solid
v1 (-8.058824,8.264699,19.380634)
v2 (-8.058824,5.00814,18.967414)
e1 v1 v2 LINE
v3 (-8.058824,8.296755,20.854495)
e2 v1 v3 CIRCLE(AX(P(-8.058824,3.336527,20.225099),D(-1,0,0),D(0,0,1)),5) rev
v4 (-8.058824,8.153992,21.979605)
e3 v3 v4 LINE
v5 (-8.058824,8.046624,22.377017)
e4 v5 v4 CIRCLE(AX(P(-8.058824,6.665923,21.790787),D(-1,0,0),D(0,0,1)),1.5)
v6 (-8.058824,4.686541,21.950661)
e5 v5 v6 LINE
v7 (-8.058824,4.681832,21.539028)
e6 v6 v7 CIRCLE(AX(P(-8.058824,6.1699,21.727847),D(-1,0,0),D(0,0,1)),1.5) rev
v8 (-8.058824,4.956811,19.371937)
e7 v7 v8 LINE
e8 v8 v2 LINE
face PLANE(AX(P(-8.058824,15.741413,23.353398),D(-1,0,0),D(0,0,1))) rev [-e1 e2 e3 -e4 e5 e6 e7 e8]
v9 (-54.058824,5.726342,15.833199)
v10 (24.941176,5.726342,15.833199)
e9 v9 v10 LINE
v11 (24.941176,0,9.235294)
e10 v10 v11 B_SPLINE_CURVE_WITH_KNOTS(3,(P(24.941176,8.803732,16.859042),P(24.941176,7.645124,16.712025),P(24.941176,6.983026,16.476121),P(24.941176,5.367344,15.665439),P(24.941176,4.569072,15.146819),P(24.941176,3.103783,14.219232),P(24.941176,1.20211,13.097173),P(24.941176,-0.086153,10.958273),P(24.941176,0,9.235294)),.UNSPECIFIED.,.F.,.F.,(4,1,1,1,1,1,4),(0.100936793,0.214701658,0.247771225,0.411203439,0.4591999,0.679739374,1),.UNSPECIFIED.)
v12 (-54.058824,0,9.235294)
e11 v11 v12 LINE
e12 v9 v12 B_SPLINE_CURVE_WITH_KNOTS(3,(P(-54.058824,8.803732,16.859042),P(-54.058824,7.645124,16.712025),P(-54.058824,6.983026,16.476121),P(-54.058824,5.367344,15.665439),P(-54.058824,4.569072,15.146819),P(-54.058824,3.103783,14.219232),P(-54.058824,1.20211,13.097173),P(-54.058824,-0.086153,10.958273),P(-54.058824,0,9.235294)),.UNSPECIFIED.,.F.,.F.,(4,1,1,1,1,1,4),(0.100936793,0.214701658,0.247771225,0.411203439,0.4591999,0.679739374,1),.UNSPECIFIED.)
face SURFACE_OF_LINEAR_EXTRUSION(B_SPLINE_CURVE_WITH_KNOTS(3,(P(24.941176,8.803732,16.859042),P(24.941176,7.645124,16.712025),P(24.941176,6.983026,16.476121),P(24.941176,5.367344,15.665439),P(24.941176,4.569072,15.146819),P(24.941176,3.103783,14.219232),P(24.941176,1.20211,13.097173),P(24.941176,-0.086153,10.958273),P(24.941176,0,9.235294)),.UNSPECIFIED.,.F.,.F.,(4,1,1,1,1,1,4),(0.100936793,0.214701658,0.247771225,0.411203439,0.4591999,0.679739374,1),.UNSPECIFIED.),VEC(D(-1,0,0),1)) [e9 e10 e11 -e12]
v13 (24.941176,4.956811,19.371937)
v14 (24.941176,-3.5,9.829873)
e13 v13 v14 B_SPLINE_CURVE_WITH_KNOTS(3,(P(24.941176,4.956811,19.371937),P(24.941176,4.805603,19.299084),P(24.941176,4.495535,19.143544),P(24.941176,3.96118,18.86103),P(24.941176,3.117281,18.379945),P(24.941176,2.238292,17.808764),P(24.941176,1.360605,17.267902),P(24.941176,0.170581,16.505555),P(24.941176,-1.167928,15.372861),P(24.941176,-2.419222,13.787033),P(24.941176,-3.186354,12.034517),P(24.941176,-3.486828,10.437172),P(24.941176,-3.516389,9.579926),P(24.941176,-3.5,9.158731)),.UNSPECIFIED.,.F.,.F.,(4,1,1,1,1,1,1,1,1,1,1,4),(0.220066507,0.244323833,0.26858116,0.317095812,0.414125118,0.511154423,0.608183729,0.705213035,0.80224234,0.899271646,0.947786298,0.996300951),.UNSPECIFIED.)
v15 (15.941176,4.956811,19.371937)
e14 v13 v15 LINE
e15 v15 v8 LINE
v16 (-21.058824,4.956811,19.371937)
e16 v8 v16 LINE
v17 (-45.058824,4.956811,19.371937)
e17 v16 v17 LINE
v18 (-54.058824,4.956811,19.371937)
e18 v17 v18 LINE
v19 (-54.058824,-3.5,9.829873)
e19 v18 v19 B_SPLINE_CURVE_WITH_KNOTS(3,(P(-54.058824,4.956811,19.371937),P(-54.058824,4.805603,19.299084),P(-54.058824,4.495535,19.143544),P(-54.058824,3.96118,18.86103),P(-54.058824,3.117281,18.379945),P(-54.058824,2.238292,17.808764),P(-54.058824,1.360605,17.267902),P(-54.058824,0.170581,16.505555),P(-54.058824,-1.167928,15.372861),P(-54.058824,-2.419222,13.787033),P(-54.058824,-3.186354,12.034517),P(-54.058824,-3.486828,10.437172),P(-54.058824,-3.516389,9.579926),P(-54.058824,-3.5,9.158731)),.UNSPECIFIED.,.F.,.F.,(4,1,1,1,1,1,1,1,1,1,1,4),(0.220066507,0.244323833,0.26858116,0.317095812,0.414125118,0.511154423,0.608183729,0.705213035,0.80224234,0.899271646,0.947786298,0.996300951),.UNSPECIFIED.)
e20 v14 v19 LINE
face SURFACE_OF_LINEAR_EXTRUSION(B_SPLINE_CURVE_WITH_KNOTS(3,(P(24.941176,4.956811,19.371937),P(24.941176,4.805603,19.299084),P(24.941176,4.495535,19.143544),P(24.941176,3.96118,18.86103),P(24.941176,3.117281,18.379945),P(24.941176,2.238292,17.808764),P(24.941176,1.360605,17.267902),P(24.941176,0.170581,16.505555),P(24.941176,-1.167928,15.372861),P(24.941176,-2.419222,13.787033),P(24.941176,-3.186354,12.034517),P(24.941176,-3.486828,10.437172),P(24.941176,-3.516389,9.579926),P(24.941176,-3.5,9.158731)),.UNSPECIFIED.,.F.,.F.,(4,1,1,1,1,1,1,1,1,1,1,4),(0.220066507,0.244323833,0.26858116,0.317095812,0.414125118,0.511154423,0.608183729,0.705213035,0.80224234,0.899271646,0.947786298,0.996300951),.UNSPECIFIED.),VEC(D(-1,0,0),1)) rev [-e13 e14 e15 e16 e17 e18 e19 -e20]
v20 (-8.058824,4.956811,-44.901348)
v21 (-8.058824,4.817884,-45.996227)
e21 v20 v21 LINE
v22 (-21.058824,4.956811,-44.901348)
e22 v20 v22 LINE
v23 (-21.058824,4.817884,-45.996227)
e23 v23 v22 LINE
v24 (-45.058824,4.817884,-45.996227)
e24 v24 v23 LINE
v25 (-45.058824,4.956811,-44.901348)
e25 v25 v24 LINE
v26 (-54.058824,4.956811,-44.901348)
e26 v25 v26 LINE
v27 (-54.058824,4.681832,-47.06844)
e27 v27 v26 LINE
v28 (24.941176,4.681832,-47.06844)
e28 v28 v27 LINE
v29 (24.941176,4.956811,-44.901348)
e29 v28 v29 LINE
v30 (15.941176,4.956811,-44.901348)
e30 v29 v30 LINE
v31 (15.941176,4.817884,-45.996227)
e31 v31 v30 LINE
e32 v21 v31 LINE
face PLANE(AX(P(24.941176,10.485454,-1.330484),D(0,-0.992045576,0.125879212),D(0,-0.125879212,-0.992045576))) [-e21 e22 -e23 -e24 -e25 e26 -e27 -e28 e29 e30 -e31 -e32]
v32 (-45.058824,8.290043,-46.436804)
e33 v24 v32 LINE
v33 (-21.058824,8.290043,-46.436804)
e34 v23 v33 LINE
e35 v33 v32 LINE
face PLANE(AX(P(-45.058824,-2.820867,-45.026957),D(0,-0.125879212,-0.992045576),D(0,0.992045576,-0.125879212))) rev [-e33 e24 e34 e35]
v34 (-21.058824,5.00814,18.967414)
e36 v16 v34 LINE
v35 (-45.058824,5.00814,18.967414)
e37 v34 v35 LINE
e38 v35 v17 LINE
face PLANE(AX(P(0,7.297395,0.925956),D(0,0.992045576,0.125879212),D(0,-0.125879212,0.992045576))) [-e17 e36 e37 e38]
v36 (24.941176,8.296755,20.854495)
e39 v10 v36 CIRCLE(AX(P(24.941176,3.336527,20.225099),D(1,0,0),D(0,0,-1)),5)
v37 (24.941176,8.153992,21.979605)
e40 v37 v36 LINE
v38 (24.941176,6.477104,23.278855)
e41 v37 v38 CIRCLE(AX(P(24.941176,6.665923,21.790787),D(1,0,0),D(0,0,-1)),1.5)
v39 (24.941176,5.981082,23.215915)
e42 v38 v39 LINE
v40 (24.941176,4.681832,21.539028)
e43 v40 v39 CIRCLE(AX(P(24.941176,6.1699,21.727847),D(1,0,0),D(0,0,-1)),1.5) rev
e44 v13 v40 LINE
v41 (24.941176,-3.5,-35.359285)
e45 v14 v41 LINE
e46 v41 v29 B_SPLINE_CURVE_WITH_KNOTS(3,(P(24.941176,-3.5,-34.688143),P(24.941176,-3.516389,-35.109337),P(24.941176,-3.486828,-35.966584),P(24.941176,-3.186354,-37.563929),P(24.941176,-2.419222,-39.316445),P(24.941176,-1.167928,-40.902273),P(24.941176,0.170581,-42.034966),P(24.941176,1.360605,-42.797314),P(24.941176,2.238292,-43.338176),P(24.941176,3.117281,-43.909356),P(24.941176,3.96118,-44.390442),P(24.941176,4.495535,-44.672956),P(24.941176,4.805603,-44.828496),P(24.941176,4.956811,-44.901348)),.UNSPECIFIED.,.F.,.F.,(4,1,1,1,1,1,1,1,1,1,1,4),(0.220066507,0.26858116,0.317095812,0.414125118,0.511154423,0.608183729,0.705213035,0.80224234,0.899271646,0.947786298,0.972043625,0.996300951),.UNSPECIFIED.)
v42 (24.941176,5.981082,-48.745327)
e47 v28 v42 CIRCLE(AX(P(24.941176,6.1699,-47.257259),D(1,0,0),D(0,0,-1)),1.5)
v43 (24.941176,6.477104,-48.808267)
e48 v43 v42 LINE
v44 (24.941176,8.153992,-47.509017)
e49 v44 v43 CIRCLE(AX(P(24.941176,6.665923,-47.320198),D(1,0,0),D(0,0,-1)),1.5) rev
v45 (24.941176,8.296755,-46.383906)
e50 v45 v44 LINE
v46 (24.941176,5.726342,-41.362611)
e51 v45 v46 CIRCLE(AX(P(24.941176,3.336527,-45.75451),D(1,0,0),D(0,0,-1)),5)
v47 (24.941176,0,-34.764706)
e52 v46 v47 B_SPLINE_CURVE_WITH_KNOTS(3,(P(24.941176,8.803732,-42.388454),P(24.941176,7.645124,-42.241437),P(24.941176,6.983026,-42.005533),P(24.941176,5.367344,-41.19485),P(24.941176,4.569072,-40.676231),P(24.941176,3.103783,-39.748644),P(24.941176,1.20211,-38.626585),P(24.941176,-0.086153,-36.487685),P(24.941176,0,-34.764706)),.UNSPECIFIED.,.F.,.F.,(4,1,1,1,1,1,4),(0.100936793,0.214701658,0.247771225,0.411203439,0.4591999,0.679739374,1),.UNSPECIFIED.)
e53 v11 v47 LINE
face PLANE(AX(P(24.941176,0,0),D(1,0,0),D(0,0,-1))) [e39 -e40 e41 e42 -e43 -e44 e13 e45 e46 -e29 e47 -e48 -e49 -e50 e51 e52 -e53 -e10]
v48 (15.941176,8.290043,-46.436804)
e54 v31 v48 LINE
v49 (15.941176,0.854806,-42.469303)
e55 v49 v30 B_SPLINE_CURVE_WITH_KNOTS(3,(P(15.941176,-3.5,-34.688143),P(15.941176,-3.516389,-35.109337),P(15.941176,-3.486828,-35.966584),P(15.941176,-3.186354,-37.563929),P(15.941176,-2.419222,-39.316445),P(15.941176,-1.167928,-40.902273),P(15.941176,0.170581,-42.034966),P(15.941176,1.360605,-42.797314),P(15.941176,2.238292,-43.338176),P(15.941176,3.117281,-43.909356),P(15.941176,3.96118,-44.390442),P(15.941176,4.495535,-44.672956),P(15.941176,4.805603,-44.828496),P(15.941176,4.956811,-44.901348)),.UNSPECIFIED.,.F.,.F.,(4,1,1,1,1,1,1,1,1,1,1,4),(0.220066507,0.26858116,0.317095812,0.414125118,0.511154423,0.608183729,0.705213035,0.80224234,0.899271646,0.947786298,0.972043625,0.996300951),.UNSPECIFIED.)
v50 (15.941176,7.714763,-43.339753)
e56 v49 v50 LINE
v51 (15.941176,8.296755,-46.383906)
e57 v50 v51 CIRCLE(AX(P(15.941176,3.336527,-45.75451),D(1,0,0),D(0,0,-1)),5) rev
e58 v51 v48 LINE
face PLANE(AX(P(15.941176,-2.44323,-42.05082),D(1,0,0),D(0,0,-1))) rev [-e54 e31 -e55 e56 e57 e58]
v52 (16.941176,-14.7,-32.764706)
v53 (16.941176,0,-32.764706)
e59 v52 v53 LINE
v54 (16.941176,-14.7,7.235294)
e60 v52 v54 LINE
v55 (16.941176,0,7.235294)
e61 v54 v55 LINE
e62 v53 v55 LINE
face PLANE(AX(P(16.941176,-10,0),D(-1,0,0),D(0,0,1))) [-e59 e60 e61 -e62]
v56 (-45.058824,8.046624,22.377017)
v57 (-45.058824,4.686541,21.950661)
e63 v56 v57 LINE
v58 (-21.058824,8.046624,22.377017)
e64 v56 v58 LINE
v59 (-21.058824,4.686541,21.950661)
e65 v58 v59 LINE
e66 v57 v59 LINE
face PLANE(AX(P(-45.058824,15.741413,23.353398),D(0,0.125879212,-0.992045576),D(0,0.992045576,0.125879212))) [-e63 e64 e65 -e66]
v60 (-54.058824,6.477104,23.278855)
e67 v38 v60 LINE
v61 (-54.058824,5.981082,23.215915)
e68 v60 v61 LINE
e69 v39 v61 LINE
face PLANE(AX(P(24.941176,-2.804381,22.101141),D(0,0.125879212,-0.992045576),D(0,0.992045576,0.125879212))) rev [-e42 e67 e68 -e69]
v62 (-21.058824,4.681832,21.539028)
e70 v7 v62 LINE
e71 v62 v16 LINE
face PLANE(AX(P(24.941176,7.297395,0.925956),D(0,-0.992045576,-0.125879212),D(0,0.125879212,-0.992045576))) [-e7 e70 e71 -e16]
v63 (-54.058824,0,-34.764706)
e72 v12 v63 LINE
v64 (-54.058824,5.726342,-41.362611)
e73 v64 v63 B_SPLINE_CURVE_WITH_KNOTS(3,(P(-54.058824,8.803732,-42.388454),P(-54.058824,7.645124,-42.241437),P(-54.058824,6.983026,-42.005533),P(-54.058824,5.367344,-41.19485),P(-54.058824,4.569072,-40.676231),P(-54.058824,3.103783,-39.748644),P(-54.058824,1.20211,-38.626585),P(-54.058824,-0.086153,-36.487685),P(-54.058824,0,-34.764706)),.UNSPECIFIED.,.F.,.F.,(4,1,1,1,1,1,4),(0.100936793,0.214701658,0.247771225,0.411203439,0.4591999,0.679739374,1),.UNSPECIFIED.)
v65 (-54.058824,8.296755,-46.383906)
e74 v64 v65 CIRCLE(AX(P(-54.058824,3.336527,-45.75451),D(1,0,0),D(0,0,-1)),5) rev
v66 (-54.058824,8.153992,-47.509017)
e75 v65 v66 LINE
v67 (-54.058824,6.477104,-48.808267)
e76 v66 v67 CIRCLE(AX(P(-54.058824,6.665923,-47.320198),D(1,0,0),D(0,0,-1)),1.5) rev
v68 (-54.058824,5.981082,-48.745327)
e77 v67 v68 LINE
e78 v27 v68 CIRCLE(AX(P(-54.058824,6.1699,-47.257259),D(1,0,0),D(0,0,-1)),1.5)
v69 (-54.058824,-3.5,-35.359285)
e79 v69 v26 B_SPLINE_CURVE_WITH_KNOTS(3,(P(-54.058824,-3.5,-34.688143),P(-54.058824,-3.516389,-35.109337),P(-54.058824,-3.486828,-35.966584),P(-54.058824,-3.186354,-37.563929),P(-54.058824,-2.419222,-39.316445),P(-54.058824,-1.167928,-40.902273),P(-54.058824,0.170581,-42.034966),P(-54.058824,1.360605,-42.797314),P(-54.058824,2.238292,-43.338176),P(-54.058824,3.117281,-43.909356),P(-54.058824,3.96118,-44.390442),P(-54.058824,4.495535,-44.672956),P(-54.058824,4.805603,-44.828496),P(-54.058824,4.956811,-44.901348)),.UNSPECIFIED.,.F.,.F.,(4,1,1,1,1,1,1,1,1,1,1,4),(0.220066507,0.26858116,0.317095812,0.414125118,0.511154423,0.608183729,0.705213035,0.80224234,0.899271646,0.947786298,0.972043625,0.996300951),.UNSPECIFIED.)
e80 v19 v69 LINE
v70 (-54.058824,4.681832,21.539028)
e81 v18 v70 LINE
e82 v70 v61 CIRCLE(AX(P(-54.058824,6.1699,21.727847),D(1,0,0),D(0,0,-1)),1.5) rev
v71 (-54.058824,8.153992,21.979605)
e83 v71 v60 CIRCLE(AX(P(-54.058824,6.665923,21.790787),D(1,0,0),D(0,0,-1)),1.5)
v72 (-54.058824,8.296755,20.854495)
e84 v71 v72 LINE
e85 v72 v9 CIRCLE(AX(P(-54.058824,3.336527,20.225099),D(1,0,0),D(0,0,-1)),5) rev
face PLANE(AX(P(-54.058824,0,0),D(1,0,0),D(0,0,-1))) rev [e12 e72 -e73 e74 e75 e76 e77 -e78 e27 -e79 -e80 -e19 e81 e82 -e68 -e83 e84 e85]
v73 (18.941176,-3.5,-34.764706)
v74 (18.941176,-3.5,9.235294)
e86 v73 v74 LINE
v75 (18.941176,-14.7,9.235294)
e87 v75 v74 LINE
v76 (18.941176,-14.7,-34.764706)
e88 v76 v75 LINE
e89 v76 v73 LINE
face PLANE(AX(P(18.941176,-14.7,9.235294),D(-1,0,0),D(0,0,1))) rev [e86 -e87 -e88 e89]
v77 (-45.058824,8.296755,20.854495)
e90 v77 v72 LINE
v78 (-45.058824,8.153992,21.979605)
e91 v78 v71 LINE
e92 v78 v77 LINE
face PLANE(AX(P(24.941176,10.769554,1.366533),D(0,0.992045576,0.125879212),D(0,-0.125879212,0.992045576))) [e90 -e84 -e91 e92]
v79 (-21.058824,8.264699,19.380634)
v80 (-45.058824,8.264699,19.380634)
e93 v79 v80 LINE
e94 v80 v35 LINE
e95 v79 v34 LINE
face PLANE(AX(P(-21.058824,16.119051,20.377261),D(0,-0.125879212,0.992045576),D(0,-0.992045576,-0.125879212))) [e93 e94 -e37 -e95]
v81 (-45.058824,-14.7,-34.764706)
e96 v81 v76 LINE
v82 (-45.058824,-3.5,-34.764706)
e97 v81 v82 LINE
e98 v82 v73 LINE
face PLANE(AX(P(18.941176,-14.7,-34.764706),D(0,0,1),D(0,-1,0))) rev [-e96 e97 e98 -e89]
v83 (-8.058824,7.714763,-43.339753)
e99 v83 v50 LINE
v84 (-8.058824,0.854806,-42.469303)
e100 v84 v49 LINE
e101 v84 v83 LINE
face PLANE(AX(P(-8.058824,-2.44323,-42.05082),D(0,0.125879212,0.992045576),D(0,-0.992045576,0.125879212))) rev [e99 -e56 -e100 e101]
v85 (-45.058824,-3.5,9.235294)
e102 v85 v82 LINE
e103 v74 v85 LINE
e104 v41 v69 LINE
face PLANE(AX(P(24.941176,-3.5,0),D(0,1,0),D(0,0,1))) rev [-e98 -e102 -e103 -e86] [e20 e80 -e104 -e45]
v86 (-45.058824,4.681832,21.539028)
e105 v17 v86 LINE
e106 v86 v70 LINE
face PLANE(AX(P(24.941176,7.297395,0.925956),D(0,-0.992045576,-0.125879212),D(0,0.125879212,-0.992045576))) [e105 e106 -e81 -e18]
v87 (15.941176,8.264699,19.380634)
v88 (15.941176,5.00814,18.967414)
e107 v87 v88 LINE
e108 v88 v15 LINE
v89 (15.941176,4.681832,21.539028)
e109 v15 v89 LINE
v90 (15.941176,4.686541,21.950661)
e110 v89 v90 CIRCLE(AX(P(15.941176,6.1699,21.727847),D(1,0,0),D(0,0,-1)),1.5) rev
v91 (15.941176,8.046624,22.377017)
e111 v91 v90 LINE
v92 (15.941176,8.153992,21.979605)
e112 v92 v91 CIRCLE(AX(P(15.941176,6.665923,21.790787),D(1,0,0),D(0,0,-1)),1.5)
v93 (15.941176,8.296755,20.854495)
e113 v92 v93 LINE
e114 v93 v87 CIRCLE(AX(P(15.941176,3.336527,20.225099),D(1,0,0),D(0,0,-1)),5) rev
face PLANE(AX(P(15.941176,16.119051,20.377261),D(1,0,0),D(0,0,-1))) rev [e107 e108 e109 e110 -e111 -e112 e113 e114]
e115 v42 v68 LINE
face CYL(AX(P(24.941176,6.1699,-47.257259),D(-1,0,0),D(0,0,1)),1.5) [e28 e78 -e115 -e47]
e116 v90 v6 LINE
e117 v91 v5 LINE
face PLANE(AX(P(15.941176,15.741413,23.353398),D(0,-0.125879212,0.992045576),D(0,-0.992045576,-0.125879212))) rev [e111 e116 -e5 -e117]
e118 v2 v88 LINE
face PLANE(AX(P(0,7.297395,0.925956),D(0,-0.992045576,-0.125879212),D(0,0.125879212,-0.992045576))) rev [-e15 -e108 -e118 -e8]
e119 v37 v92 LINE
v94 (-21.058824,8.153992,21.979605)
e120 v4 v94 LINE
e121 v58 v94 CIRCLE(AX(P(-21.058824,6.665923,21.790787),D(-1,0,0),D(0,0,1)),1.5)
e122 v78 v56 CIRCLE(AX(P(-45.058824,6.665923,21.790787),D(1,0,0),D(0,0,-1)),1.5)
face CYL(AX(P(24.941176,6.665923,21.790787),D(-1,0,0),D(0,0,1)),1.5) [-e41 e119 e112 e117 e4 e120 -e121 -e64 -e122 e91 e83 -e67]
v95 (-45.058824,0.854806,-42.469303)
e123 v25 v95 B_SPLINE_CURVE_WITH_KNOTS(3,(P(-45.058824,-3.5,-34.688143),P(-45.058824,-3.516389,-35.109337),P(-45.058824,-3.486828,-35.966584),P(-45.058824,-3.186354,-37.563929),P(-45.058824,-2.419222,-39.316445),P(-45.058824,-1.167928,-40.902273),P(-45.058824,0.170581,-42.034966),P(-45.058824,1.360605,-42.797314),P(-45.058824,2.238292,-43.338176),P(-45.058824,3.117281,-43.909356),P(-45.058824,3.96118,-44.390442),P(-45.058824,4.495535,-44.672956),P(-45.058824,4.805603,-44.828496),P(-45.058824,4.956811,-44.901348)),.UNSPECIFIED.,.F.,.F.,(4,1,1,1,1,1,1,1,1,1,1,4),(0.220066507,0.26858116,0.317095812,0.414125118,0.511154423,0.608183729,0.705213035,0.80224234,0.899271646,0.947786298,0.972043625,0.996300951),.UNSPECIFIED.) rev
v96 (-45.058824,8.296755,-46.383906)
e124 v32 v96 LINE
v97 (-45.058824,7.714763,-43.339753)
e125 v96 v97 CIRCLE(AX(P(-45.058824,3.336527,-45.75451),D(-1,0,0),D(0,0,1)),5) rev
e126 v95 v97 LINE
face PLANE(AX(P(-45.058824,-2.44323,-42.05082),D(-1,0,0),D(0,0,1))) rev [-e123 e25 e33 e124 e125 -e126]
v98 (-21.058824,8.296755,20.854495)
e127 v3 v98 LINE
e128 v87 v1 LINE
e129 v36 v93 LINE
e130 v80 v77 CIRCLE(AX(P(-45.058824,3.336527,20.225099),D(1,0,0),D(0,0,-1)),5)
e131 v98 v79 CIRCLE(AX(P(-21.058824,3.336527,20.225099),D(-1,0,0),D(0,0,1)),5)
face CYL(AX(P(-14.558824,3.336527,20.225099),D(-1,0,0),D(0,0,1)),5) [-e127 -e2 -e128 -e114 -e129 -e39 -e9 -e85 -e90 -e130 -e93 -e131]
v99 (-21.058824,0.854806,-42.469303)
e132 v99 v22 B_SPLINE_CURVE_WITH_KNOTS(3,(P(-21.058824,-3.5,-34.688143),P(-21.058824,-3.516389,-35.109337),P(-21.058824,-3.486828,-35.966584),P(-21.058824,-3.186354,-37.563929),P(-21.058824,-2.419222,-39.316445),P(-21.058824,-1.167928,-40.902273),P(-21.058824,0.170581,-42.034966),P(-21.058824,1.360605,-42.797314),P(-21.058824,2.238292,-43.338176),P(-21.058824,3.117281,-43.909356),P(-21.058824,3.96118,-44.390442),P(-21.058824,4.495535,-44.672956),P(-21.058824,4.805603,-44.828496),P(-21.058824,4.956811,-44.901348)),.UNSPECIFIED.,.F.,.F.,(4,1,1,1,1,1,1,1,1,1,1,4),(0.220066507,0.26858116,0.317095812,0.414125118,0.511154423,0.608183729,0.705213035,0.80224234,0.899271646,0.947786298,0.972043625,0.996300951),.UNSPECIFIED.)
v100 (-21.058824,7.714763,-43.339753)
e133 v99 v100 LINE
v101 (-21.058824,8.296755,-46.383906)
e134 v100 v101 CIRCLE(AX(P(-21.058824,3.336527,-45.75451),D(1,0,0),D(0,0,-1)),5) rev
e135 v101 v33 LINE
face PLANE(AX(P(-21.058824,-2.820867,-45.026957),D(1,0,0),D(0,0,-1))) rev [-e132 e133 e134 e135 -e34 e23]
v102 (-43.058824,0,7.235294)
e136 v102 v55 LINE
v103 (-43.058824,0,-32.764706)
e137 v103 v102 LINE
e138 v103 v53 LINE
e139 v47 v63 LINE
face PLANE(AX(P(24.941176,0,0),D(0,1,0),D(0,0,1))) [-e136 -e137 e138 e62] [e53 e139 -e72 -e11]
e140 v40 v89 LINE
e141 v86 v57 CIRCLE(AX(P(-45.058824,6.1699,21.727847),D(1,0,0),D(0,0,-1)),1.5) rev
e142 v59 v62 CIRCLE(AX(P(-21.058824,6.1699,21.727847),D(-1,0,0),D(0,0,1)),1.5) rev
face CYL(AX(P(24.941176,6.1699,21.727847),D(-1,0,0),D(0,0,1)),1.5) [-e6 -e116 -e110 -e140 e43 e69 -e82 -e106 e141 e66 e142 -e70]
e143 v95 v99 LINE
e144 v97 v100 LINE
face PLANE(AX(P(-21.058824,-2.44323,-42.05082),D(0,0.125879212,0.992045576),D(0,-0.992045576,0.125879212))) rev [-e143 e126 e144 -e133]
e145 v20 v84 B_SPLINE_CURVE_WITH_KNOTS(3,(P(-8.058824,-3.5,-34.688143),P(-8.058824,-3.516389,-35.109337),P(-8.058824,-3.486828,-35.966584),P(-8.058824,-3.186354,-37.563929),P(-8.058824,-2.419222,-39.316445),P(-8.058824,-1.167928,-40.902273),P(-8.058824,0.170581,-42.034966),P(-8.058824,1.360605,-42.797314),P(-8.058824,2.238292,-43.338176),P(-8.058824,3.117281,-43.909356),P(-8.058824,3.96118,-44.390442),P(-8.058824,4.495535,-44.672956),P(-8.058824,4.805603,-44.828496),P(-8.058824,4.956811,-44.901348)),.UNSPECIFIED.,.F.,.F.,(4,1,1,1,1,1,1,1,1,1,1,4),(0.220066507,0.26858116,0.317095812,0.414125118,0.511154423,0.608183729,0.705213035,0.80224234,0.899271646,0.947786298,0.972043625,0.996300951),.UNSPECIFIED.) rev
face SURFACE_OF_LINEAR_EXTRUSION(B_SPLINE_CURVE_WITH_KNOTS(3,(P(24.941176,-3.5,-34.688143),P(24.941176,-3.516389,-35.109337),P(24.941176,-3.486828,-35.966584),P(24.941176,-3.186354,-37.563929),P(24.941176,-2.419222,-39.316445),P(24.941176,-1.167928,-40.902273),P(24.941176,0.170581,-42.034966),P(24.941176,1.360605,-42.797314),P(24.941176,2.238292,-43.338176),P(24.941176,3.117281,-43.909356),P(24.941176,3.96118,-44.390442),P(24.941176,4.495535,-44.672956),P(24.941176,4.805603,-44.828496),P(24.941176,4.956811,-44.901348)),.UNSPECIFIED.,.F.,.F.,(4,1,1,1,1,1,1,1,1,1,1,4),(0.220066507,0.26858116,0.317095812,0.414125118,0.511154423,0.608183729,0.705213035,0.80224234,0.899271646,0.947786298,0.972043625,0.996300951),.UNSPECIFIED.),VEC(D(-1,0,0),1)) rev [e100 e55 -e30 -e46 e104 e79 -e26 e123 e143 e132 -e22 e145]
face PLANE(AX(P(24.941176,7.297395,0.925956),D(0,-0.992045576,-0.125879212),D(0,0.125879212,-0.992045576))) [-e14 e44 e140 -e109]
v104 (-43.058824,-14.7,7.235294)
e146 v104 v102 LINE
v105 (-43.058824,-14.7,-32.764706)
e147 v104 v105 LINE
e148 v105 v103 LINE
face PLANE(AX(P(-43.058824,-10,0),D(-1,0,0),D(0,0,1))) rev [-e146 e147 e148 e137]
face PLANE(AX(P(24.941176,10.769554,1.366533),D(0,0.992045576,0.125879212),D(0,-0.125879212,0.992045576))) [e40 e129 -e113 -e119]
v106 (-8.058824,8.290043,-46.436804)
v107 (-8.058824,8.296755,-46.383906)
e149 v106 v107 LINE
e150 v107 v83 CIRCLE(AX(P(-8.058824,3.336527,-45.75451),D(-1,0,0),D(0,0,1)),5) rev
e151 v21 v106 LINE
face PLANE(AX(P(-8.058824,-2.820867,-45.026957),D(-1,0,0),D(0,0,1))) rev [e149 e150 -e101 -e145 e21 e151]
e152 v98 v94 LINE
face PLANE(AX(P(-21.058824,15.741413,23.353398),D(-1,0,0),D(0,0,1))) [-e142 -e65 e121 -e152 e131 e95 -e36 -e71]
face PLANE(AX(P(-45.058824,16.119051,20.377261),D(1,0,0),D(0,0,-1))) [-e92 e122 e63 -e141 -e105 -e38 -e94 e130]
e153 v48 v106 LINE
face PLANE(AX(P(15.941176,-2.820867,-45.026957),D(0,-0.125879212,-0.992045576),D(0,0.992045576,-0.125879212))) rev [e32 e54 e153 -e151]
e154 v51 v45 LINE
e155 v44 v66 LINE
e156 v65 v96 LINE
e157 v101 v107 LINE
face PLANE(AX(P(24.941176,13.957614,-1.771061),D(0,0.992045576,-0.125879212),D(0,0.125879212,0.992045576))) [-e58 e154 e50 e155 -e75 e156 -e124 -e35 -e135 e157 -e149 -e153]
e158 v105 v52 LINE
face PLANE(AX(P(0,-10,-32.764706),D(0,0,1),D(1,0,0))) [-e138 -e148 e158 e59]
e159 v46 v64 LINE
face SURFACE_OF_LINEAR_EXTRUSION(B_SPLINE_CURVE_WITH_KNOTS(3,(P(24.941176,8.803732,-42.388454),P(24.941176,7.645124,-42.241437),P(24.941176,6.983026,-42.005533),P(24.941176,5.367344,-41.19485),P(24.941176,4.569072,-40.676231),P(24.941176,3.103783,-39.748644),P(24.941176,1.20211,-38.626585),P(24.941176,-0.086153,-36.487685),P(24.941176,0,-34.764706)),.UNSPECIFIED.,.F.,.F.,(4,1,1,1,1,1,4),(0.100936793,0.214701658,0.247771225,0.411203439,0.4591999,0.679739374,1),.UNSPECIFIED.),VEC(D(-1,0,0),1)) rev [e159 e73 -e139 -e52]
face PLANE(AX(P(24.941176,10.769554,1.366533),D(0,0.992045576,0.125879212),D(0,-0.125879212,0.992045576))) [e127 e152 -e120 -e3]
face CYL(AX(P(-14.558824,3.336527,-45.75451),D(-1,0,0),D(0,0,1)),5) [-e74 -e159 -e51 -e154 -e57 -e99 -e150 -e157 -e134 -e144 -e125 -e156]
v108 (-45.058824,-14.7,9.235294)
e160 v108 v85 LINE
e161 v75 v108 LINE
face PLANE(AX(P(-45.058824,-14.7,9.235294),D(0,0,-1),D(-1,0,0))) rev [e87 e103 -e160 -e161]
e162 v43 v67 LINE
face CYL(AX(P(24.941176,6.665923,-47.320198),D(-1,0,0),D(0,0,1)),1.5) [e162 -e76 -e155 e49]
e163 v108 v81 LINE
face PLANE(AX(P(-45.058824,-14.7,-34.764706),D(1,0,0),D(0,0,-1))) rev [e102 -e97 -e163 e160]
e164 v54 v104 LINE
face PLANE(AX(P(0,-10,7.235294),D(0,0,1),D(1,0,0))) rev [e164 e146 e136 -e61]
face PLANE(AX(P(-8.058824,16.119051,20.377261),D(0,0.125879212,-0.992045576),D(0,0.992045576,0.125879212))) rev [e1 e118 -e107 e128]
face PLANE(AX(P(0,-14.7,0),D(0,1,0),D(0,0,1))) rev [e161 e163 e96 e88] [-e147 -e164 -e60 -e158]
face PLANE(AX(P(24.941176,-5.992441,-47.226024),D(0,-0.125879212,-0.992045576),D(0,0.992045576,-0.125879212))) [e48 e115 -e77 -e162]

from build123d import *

# Parameters (mm, degrees)
BOSS_EXTRUDE1_DEPTH      = 6
BOSS_EXTRUDE1_DEPTH_BACK = 73
SKETCH1_W                = 60
SKETCH1_H                = 40
CUT_EXTRUDE2_DEPTH       = 10
SKETCH7_W                = 64
SKETCH7_H                = 44
SKETCH7_W_2              = 60
SKETCH7_H_2              = 40
BOSS_EXTRUDE2_DEPTH      = 11.2
SKETCH5_W                = 24
SKETCH5_H                = 3
CUT_EXTRUDE3_DEPTH       = 11.2
SKETCH8_W                = 24
SKETCH8_H                = 3
CUT_EXTRUDE4_DEPTH       = 11.2
FILLET1_R                = 5


with BuildPart() as part:
    # Sketch2 → Boss-Extrude1 (new, two sides: drawn at the far end of the back side and taken through both)
    with BuildSketch(Plane(origin=(18.941176471, 0, 0), x_dir=(0, 0, -1), z_dir=(1, 0, 0)).offset(-BOSS_EXTRUDE1_DEPTH_BACK)):
        with BuildLine():
            Line((34.764705882, 0), (-9.235294118, 0))
            add(Edge.make_bspline(
                [(-16.859042356, 8.803732274), (-16.71202536, 7.645123783), (-16.476121405, 6.983025742), (-15.665438552, 5.367344471), (-15.146819104, 4.569071681), (-14.219232142, 3.103782941), (-13.097173401, 1.202110064), (-10.958273151, -0.0861532), (-9.235294118, 0)],
                knots=[0.100936793, 0.100936793, 0.100936793, 0.100936793, 0.214701658, 0.247771225, 0.411203439, 0.4591999, 0.679739374, 1, 1, 1, 1], degree=3))
            Line((-16.859042356, 8.803732274), (-20.331201871, 8.363155033))
            Line((-20.331201871, 8.363155033), (-21.979605491, 8.153991509))
            ThreePointArc((-21.979605491, 8.153991509), (-22.976524971, 7.58463131), (-23.278855037, 6.477104328))
            Line((-23.278855037, 6.477104328), (-23.215915431, 5.981081541))
            ThreePointArc((-23.215915431, 5.981081541), (-22.646555232, 4.984162061), (-21.53902825, 4.681831995))
            Line((-21.53902825, 4.681831995), (-19.89062463, 4.890995519))
            Line((-19.89062463, 4.890995519), (-19.371936566, 4.956811088))
            add(Edge.make_bspline(
                [(-19.371936566, 4.956811088), (-19.299083809, 4.805602772), (-19.143543885, 4.495535048), (-18.861030136, 3.961180263), (-18.379944727, 3.117280646), (-17.808764188, 2.238291872), (-17.267901922, 1.360604939), (-16.505554516, 0.170581495), (-15.372861084, -1.167927692), (-13.787032793, -2.419221644), (-12.034516859, -3.186353681), (-10.648338067, -3.44710609), (-10.029136817, -3.492321417), (-9.829873201, -3.5)],
                knots=[0.220066507, 0.220066507, 0.220066507, 0.220066507, 0.244323833, 0.26858116, 0.317095812, 0.414125118, 0.511154423, 0.608183729, 0.705213035, 0.80224234, 0.899271646, 0.947786298, 0.970646745, 0.970646745, 0.970646745, 0.970646745], degree=3))
            Line((-9.829873201, -3.5), (-9.158730941, -3.5))
            Line((-9.158730941, -3.5), (34.688142706, -3.5))
            Line((34.688142706, -3.5), (35.359284966, -3.5))
            add(Edge.make_bspline(
                [(35.359284966, -3.5), (35.558548581, -3.492321417), (36.177749832, -3.44710609), (37.563928624, -3.186353681), (39.316444558, -2.419221644), (40.902272849, -1.167927692), (42.034966281, 0.170581495), (42.797313687, 1.360604939), (43.338175952, 2.238291872), (43.909356491, 3.117280646), (44.390441901, 3.961180263), (44.67295565, 4.495535048), (44.828495573, 4.805602772), (44.901348331, 4.956811088)],
                knots=[0.245720713, 0.245720713, 0.245720713, 0.245720713, 0.26858116, 0.317095812, 0.414125118, 0.511154423, 0.608183729, 0.705213035, 0.80224234, 0.899271646, 0.947786298, 0.972043625, 0.996300951, 0.996300951, 0.996300951, 0.996300951], degree=3))
            Line((44.901348331, 4.956811088), (45.420036395, 4.890995519))
            Line((45.420036395, 4.890995519), (47.068440015, 4.681831995))
            ThreePointArc((47.068440015, 4.681831995), (48.175966997, 4.984162061), (48.745327196, 5.981081541))
            Line((48.745327196, 5.981081541), (48.808266802, 6.477104328))
            ThreePointArc((48.808266802, 6.477104328), (48.505936735, 7.58463131), (47.509017256, 8.153991509))
            Line((47.509017256, 8.153991509), (45.860613636, 8.363155033))
            Line((45.860613636, 8.363155033), (42.388454121, 8.803732274))
            add(Edge.make_bspline(
                [(42.388454121, 8.803732274), (42.241437125, 7.645123783), (42.00553317, 6.983025742), (41.194850317, 5.367344471), (40.676230869, 4.569071681), (39.748643907, 3.103782941), (38.626585166, 1.202110064), (36.487684916, -0.0861532), (34.764705882, 0)],
                knots=[0.100936793, 0.100936793, 0.100936793, 0.100936793, 0.214701658, 0.247771225, 0.411203439, 0.4591999, 0.679739374, 1, 1, 1, 1], degree=3))
        make_face()
    extrude(amount=BOSS_EXTRUDE1_DEPTH + BOSS_EXTRUDE1_DEPTH_BACK)

    # Sketch1 → Cut-Extrude2 (cut)
    with BuildSketch(Plane(origin=(0, 0, 0), x_dir=(1, 0, 0), z_dir=(0, 1, 0))):
        with Locations((-13.058823529, 12.764705882)):
            Rectangle(SKETCH1_W, SKETCH1_H)
    extrude(amount=-CUT_EXTRUDE2_DEPTH, mode=Mode.SUBTRACT)

    # Sketch7 → Boss-Extrude2 (add)
    with BuildSketch(Plane.XZ.offset(3.5)):
        with Locations((-13.058823529, -12.764705882)):
            Rectangle(SKETCH7_W, SKETCH7_H)
        with Locations((-13.058823529, -12.764705882)):
            Rectangle(SKETCH7_W_2, SKETCH7_H_2, mode=Mode.SUBTRACT)
    extrude(amount=BOSS_EXTRUDE2_DEPTH)

    # Sketch5 → Cut-Extrude3 (cut)
    with BuildSketch(Plane(origin=(0, 7.29739461, 0.925955726), x_dir=(1, 0, 0), z_dir=(0, -0.9920455755956746, -0.12587921171125438))):
        with Locations((-33.058823529, 19.686118423)):
            Rectangle(SKETCH5_W, SKETCH5_H)
        with Locations((3.941176471, 19.686118423)):
            Rectangle(SKETCH5_W, SKETCH5_H)
    extrude(amount=-CUT_EXTRUDE3_DEPTH, mode=Mode.SUBTRACT)

    # Sketch8 → Cut-Extrude4 (cut)
    with BuildSketch(Plane(origin=(0, 13.957613838, -1.7710612), x_dir=(1, 0, 0), z_dir=(0, 0.9920455755956736, -0.12587921171126285))):
        with Locations((-33.058823529, 43.523881917)):
            Rectangle(SKETCH8_W, SKETCH8_H)
        with Locations((3.941176471, 43.523881917)):
            Rectangle(SKETCH8_W, SKETCH8_H)
    extrude(amount=-CUT_EXTRUDE4_DEPTH, mode=Mode.SUBTRACT)

    # Fillet1
    # the kernel refuses this fillet: 5 mm, written as the material it takes off along each edge
    with BuildSketch(Plane(origin=(18.941176471, 8.803732274, -42.388454121), x_dir=(0, -0.12587921171125008, -0.9920455755956751), z_dir=(-1, 0, 0))) as fillet1_piece_1:
        with BuildLine():
            CenterArc((4.027488586, 5), FILLET1_R, 201.320916369, 68.679083631)
            Line((-0.6303042, 3.182043355), (-0.723460056, 3.145684222))
            ThreePointArc((-0.723460056, 3.145684222), (-0.228216041, 1.608856089), (-0.1, -2.43e-07))
            Line((-0.1, -2.43e-07), (0, -0.1))
            Line((0, -0.1), (4.027488586, -0.1))
            Line((4.027488586, -0.1), (4.027488586, 0))
        make_face()
    extrude(amount=83.068721464, mode=Mode.SUBTRACT)
    with BuildSketch(Plane(origin=(18.941176471, 8.803732274, 16.859042356), x_dir=(0, -0.12587921171124858, 0.9920455755956752), z_dir=(-1, 0, 0))) as fillet1_piece_2:
        with BuildLine():
            CenterArc((4.027488586, -5), FILLET1_R, 90, 68.679083631)
            Line((-0.6303042, -3.182043355), (-0.723460056, -3.145684222))
            ThreePointArc((-0.723460056, -3.145684222), (-0.228216041, -1.608856089), (-0.1, 2.43e-07))
            Line((-0.1, 2.43e-07), (0, 0.1))
            Line((0, 0.1), (4.027488586, 0.1))
            Line((4.027488586, 0.1), (4.027488586, 0))
        make_face()
    extrude(amount=83.068721464, mode=Mode.SUBTRACT)
    with BuildSketch(Plane(origin=(18.941176471, 8.803732274, 16.859042356), x_dir=(0, -0.948678952181438, -0.31624080332545423), z_dir=(1, 0, 0))) as fillet1_piece_3:
        with BuildLine():
            CenterArc((4.12213797, -4.922259934), FILLET1_R, 100.116712127, 68.679083631)
            Line((-0.782566531, -3.950728279), (-0.880660621, -3.931297646))
            Line((-0.880660621, -3.931297646), (-0.09809409, 0.019430633))
            Line((-0.09809409, 0.019430633), (0.019430395, 0.098094137))
            ThreePointArc((0.019430395, 0.098094137), (1.622536562, -0.088744475), (3.226303182, 0.098445199))
            Line((3.226303182, 0.098445199), (3.24386857, 0))
        make_face()
    extrude(amount=16.068721464, mode=Mode.SUBTRACT)
    with BuildSketch(Plane(origin=(18.941176471, 8.803732274, -42.388454121), x_dir=(0, -0.12587921171125008, -0.9920455755956751), z_dir=(1, 0, 0))) as fillet1_piece_4:
        with BuildLine():
            CenterArc((4.027488586, -5), FILLET1_R, 90, 68.679083631)
            Line((-0.6303042, -3.182043355), (-0.723460056, -3.145684222))
            ThreePointArc((-0.723460056, -3.145684222), (-0.228216041, -1.608856089), (-0.1, 2.43e-07))
            Line((-0.1, 2.43e-07), (0, 0.1))
            Line((0, 0.1), (4.027488586, 0.1))
            Line((4.027488586, 0.1), (4.027488586, 0))
        make_face()
    extrude(amount=16.068721464, mode=Mode.SUBTRACT)


solid = part.part
